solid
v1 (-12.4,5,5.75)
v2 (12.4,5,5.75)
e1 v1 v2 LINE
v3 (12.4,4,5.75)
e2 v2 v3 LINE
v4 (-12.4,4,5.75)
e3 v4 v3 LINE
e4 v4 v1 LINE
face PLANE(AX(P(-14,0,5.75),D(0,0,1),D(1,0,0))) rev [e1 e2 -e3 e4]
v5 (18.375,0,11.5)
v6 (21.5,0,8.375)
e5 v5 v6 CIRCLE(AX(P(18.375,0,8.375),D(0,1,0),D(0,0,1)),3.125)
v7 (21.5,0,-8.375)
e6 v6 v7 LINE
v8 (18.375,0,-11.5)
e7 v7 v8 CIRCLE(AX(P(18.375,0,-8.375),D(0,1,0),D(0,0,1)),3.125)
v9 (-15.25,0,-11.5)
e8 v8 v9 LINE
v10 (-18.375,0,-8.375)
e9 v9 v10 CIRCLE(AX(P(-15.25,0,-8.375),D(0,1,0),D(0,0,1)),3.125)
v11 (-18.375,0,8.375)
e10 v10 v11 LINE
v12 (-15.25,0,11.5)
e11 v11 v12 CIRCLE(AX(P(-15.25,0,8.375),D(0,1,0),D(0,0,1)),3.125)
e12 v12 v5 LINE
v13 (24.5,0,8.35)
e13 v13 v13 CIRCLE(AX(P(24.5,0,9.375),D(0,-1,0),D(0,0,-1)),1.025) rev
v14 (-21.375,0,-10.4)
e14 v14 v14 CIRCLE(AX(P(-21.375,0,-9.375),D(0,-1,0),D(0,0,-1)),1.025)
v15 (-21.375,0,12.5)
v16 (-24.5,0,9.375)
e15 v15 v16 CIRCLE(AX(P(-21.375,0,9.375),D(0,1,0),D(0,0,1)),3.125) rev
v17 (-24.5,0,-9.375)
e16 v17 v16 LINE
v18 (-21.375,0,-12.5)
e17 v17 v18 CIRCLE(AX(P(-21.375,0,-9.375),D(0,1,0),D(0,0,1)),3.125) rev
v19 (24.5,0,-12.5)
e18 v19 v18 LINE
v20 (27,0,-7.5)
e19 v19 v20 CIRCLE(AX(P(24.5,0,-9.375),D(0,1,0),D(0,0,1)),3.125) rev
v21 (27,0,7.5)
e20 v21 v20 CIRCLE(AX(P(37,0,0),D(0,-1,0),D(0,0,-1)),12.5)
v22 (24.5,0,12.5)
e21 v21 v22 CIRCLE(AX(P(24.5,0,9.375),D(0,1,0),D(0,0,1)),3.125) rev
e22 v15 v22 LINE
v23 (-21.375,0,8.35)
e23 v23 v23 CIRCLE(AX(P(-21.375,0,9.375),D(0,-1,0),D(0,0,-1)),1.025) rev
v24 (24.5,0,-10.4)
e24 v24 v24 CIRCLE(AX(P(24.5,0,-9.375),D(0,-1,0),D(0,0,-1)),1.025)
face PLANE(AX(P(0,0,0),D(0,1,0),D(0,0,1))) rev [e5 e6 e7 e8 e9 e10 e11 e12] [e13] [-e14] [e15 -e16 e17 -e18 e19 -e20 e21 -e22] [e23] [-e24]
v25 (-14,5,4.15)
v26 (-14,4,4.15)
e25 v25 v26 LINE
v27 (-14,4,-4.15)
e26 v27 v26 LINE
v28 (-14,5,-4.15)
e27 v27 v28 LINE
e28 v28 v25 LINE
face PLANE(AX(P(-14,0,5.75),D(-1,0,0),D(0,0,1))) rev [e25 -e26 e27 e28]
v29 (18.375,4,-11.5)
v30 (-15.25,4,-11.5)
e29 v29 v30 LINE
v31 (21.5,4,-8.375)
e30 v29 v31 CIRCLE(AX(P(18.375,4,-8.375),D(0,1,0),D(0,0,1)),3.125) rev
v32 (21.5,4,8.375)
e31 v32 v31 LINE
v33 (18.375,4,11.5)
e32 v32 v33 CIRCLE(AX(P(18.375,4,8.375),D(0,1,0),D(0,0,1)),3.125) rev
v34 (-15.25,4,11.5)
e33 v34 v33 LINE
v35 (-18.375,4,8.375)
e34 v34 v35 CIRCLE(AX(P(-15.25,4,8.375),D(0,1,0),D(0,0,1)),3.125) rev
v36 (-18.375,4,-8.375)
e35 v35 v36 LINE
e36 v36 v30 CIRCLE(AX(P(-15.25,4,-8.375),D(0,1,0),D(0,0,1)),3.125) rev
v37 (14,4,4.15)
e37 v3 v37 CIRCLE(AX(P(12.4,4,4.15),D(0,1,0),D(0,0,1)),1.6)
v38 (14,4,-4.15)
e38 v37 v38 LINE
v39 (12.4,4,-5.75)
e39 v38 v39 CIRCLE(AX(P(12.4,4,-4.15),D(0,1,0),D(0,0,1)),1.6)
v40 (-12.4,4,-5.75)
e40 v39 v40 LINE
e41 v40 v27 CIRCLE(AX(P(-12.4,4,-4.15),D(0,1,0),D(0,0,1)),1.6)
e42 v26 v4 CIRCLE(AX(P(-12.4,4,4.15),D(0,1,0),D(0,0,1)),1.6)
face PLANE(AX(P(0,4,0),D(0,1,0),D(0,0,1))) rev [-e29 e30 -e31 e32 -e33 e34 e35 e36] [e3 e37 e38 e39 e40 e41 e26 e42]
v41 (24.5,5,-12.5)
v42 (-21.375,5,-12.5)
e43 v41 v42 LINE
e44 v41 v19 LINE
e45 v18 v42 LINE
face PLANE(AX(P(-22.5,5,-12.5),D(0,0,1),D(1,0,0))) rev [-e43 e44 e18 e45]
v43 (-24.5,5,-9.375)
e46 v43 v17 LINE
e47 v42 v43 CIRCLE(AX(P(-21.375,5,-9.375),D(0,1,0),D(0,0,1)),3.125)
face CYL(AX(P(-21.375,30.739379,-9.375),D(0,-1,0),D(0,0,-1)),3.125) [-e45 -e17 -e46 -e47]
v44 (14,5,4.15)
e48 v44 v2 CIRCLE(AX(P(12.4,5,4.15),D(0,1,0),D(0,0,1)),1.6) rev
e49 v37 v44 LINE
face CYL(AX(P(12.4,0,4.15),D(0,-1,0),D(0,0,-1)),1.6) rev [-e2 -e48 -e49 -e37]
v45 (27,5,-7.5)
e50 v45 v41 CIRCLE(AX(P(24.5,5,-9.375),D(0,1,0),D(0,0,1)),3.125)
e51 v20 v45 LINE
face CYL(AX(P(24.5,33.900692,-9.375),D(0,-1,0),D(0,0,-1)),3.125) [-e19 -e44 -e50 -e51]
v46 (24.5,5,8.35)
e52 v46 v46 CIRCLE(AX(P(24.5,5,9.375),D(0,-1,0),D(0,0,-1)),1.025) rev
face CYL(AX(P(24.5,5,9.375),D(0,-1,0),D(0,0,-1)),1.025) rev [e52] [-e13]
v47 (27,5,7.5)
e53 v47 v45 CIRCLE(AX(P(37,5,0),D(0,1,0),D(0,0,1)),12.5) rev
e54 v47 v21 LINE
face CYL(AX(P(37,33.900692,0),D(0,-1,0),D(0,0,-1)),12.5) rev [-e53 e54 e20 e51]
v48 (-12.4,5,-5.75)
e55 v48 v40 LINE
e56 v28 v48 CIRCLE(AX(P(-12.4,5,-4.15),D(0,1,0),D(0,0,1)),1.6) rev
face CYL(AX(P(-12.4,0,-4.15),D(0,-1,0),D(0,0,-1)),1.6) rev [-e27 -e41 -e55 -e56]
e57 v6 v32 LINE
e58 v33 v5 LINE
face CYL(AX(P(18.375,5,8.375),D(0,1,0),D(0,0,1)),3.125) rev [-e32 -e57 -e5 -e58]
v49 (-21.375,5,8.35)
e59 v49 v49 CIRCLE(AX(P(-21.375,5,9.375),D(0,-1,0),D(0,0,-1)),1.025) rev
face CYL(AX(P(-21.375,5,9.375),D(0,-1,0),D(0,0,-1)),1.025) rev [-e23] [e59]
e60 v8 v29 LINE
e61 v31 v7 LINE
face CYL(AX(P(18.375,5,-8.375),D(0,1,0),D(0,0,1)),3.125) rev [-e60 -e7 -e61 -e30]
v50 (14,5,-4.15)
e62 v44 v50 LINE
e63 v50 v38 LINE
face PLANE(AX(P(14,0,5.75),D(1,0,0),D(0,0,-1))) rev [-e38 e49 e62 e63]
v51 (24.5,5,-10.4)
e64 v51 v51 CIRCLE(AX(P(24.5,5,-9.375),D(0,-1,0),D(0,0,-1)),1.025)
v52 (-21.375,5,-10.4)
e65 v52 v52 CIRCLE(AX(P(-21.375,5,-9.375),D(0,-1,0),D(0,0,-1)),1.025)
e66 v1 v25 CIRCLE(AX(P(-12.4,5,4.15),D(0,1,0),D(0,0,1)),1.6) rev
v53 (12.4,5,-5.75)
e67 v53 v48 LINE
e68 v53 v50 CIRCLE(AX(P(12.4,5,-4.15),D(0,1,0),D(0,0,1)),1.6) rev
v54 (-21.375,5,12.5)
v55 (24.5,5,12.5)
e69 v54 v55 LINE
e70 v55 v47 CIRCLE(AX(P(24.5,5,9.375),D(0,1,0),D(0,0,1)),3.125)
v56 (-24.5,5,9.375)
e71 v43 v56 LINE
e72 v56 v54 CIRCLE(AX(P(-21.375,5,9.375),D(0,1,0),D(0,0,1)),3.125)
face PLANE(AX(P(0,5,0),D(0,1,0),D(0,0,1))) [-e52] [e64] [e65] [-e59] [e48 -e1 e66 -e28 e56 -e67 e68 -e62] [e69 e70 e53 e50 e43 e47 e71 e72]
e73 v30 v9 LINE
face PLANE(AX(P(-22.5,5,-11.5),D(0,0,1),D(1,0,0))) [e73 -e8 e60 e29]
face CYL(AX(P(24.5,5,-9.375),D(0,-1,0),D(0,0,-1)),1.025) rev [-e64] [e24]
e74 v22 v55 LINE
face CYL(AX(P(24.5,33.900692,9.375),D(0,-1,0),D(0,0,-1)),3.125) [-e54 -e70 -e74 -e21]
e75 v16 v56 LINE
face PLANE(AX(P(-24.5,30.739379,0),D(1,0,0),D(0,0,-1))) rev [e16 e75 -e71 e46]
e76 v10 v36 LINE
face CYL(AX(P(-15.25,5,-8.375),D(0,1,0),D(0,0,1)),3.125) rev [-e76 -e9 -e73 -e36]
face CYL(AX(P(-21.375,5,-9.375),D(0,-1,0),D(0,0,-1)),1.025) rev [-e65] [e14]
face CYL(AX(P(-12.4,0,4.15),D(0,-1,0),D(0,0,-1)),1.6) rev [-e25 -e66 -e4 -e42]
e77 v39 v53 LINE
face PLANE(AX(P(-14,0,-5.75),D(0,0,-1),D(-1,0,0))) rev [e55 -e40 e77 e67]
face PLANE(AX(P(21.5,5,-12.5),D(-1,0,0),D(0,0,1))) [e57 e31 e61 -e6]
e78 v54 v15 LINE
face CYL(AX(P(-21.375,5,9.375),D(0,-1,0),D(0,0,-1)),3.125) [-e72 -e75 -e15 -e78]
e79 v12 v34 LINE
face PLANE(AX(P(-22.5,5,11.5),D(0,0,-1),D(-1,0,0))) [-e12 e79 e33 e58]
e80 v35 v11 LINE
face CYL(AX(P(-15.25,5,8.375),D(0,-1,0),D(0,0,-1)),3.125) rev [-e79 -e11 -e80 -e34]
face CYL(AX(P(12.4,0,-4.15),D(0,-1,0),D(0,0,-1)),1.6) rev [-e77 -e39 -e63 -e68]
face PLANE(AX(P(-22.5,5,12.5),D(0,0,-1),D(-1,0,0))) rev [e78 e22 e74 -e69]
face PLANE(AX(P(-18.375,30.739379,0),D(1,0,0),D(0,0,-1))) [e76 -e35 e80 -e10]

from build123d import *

# Parameters (mm, degrees)
BOSS_EXTRUDE1_DEPTH = 5
SKETCH2_W           = 28
SKETCH2_H           = 11.5
CUT_EXTRUDE1_DEPTH  = 27.220221204253797
SHELL1_T            = -1
FILLET1_R           = 1.6
FILLET2_R           = 3.125
BOSS_EXTRUDE2_DEPTH = 5
FILLET3_R           = 3.125
FILLET4_R           = 3.125
BOSS_EXTRUDE3_START = -5
BOSS_EXTRUDE3_DEPTH = 5
FILLET5_R           = 3.125
SKETCH7_R           = 1.0250000000000001
CUT_EXTRUDE2_DEPTH  = 31.730939361252858


with BuildPart() as part:
    # Sketch1 → Boss-Extrude1 (new body)
    with BuildSketch(Plane(origin=(0, 0, 0), x_dir=(1, 0, 0), z_dir=(0, 1, 0))):
        Polygon((-22.500000000000007, 12.500000000000004), (22.499999999999996, 12.500000000000004), (22.499999999999996, -12.499999999999996), (-22.500000000000004, -12.499999999999996), align=None)
    extrude(amount=BOSS_EXTRUDE1_DEPTH)

    # Sketch2 → Cut-Extrude1 (cut, through all)
    with BuildSketch(Plane(origin=(0, 5, 0), x_dir=(1, 0, 0), z_dir=(0, 1, 0))):
        Rectangle(SKETCH2_W, SKETCH2_H)
    extrude(amount=-CUT_EXTRUDE1_DEPTH, mode=Mode.SUBTRACT)

    # Shell1
    shell1_openings = [part.faces().sort_by_distance(p)[0] for p in [
        (14, 2.5, 0),
        (0, 2.5, 5.75),
        (-14, 2.5, 0),
        (0, 2.5, -5.75),
        (0, 0, -11.985218493),
    ]]
    offset(amount=SHELL1_T, openings=shell1_openings, kind=Kind.INTERSECTION)

    # Fillet1
    fillet1_edges = [part.edges().sort_by_distance(p)[0] for p in [
        (14.000000000000002, 4.5, -5.750000000000001),
        (14.000000000000002, 4.5, 5.749999999999999),
        (-13.999999999999998, 4.5, 5.749999999999999),
        (-13.999999999999998, 4.5, -5.750000000000001),
    ]]
    fillet(fillet1_edges, radius=FILLET1_R)

    # Fillet2
    fillet2_edges = [part.edges().sort_by_distance(p)[0] for p in [
        (21.499999999999996, 2, 11.499999999999996),
        (21.499999999999993, 2, -11.500000000000004),
        (-21.500000000000007, 2, -11.500000000000004),
        (-21.500000000000004, 2, 11.499999999999996),
    ]]
    fillet(fillet2_edges, radius=FILLET2_R)

    # Sketch4 → Boss-Extrude2 (add)
    with BuildSketch(Plane.XZ):
        with BuildLine():
            Line((22.499999999999996, 12.499999999999996), (22.499999999999996, -12.500000000000004))
            Line((22.499999999999996, -12.500000000000004), (37, -12.5))
            ThreePointArc((37, -12.500000000000002), (24.5, 6.814e-14), (37.000000000000135, 12.500000000000002))
            Line((37.000000000000135, 12.500000000000002), (22.499999999999996, 12.499999999999996))
        make_face()
    extrude(amount=-BOSS_EXTRUDE2_DEPTH)

    # Fillet3
    fillet3_edges = [part.edges().sort_by_distance(p)[0] for p in [
        (37, 2.5, -12.5),
    ]]
    fillet(fillet3_edges, radius=FILLET3_R)
    fillet3_2_edges = [part.edges().sort_by_distance(p)[0] for p in [
        (37.000000000000135, 2.5, 12.5),
    ]]
    fillet(fillet3_2_edges, radius=FILLET3_R)

    # Fillet4
    fillet4_edges = [part.edges().sort_by_distance(p)[0] for p in [
        (-22.500000000000004, 2.5, 12.499999999999996),
        (-22.500000000000007, 2.5, -12.500000000000004),
    ]]
    fillet(fillet4_edges, radius=FILLET4_R)

    # Sketch6 → Boss-Extrude3 (add)
    with BuildSketch(Plane.XZ.offset(BOSS_EXTRUDE3_START)):
        with BuildLine():
            ThreePointArc((-21.500000000000004, -8.375000000000004), (-20.584708691207968, -10.584708691207965), (-18.375000000000007, -11.500000000000004))
            Line((-18.375000000000004, -11.500000000000004), (-18.375000000000004, 11.499999999999996))
            ThreePointArc((-18.375000000000004, 11.499999999999996), (-20.58470869120796, 10.584708691207954), (-21.5, 8.374999999999996))
            Line((-21.5, 8.374999999999996), (-21.500000000000004, -8.375000000000004))
        make_face()
        Polygon((-24.5, -12.500000000000004), (-22.500000000000007, -12.500000000000004), (-22.500000000000007, -9.375000000000005), (-22.500000000000004, 9.374999999999996), (-22.500000000000004, 12.499999999999996), (-24.5, 12.499999999999991), align=None)
        with BuildLine():
            Line((-22.500000000000004, 9.374999999999996), (-22.500000000000007, -9.375000000000005))
            ThreePointArc((-22.500000000000007, -9.375000000000005), (-21.584708691207968, -11.584708691207966), (-19.375000000000007, -12.500000000000002))
            Line((-19.375000000000007, -12.500000000000004), (-18.375000000000004, -12.500000000000004))
            Line((-18.375000000000004, -12.500000000000004), (-18.375000000000004, -11.500000000000004))
            ThreePointArc((-18.375000000000007, -11.500000000000004), (-20.584708691207968, -10.584708691207965), (-21.500000000000004, -8.375000000000004))
            Line((-21.500000000000004, -8.375000000000004), (-21.5, 8.374999999999996))
            ThreePointArc((-21.5, 8.374999999999996), (-20.58470869120796, 10.584708691207954), (-18.375000000000004, 11.499999999999996))
            Line((-18.375000000000004, 11.499999999999996), (-18.375000000000004, 12.499999999999996))
            Line((-18.375000000000004, 12.499999999999996), (-19.375000000000004, 12.499999999999996))
            ThreePointArc((-19.375000000000004, 12.499999999999996), (-21.584708691207965, 11.584708691207958), (-22.500000000000004, 9.374999999999998))
        make_face()
        with BuildLine():
            Line((-22.500000000000007, -9.375000000000005), (-22.500000000000007, -12.500000000000004))
            Line((-22.500000000000007, -12.500000000000004), (-19.375000000000007, -12.500000000000004))
            ThreePointArc((-19.375000000000007, -12.500000000000002), (-21.584708691207968, -11.584708691207966), (-22.500000000000007, -9.375000000000005))
        make_face()
        with BuildLine():
            Line((-22.500000000000004, 12.499999999999996), (-22.500000000000004, 9.374999999999996))
            ThreePointArc((-22.500000000000004, 9.374999999999998), (-21.584708691207965, 11.584708691207958), (-19.375000000000004, 12.499999999999996))
            Line((-19.375000000000004, 12.499999999999996), (-22.500000000000004, 12.499999999999996))
        make_face()
    extrude(amount=BOSS_EXTRUDE3_DEPTH)

    # Fillet5
    fillet5_edges = [part.edges().sort_by_distance(p)[0] for p in [
        (-24.5, 2.5, 12.49999999999999),
        (-24.5, 2.5, -12.500000000000004),
        (-18.375000000000004, 2, 11.499999999999996),
        (-18.375000000000007, 2, -11.500000000000004),
    ]]
    fillet(fillet5_edges, radius=FILLET5_R)

    # Sketch7 → Cut-Extrude2 (cut, through all)
    with BuildSketch(Plane(origin=(0, 0, 0), x_dir=(-1, 0, 0), z_dir=(0, -1, 0))):
        with Locations(Location((-24.499999999999996, 9.375000000000005, 0), (0, 0, 90))):
            Circle(SKETCH7_R)
        with Locations(Location((-24.499999999999996, -9.375000000000005, 0), (0, 0, 90))):
            Circle(SKETCH7_R)
        with Locations(Location((21.375, -9.375000000000005, 0), (0, 0, 90))):
            Circle(SKETCH7_R)
        with Locations(Location((21.375, 9.375000000000005, 0), (0, 0, 90))):
            Circle(SKETCH7_R)
    extrude(amount=-CUT_EXTRUDE2_DEPTH, mode=Mode.SUBTRACT)


solid = part.part
